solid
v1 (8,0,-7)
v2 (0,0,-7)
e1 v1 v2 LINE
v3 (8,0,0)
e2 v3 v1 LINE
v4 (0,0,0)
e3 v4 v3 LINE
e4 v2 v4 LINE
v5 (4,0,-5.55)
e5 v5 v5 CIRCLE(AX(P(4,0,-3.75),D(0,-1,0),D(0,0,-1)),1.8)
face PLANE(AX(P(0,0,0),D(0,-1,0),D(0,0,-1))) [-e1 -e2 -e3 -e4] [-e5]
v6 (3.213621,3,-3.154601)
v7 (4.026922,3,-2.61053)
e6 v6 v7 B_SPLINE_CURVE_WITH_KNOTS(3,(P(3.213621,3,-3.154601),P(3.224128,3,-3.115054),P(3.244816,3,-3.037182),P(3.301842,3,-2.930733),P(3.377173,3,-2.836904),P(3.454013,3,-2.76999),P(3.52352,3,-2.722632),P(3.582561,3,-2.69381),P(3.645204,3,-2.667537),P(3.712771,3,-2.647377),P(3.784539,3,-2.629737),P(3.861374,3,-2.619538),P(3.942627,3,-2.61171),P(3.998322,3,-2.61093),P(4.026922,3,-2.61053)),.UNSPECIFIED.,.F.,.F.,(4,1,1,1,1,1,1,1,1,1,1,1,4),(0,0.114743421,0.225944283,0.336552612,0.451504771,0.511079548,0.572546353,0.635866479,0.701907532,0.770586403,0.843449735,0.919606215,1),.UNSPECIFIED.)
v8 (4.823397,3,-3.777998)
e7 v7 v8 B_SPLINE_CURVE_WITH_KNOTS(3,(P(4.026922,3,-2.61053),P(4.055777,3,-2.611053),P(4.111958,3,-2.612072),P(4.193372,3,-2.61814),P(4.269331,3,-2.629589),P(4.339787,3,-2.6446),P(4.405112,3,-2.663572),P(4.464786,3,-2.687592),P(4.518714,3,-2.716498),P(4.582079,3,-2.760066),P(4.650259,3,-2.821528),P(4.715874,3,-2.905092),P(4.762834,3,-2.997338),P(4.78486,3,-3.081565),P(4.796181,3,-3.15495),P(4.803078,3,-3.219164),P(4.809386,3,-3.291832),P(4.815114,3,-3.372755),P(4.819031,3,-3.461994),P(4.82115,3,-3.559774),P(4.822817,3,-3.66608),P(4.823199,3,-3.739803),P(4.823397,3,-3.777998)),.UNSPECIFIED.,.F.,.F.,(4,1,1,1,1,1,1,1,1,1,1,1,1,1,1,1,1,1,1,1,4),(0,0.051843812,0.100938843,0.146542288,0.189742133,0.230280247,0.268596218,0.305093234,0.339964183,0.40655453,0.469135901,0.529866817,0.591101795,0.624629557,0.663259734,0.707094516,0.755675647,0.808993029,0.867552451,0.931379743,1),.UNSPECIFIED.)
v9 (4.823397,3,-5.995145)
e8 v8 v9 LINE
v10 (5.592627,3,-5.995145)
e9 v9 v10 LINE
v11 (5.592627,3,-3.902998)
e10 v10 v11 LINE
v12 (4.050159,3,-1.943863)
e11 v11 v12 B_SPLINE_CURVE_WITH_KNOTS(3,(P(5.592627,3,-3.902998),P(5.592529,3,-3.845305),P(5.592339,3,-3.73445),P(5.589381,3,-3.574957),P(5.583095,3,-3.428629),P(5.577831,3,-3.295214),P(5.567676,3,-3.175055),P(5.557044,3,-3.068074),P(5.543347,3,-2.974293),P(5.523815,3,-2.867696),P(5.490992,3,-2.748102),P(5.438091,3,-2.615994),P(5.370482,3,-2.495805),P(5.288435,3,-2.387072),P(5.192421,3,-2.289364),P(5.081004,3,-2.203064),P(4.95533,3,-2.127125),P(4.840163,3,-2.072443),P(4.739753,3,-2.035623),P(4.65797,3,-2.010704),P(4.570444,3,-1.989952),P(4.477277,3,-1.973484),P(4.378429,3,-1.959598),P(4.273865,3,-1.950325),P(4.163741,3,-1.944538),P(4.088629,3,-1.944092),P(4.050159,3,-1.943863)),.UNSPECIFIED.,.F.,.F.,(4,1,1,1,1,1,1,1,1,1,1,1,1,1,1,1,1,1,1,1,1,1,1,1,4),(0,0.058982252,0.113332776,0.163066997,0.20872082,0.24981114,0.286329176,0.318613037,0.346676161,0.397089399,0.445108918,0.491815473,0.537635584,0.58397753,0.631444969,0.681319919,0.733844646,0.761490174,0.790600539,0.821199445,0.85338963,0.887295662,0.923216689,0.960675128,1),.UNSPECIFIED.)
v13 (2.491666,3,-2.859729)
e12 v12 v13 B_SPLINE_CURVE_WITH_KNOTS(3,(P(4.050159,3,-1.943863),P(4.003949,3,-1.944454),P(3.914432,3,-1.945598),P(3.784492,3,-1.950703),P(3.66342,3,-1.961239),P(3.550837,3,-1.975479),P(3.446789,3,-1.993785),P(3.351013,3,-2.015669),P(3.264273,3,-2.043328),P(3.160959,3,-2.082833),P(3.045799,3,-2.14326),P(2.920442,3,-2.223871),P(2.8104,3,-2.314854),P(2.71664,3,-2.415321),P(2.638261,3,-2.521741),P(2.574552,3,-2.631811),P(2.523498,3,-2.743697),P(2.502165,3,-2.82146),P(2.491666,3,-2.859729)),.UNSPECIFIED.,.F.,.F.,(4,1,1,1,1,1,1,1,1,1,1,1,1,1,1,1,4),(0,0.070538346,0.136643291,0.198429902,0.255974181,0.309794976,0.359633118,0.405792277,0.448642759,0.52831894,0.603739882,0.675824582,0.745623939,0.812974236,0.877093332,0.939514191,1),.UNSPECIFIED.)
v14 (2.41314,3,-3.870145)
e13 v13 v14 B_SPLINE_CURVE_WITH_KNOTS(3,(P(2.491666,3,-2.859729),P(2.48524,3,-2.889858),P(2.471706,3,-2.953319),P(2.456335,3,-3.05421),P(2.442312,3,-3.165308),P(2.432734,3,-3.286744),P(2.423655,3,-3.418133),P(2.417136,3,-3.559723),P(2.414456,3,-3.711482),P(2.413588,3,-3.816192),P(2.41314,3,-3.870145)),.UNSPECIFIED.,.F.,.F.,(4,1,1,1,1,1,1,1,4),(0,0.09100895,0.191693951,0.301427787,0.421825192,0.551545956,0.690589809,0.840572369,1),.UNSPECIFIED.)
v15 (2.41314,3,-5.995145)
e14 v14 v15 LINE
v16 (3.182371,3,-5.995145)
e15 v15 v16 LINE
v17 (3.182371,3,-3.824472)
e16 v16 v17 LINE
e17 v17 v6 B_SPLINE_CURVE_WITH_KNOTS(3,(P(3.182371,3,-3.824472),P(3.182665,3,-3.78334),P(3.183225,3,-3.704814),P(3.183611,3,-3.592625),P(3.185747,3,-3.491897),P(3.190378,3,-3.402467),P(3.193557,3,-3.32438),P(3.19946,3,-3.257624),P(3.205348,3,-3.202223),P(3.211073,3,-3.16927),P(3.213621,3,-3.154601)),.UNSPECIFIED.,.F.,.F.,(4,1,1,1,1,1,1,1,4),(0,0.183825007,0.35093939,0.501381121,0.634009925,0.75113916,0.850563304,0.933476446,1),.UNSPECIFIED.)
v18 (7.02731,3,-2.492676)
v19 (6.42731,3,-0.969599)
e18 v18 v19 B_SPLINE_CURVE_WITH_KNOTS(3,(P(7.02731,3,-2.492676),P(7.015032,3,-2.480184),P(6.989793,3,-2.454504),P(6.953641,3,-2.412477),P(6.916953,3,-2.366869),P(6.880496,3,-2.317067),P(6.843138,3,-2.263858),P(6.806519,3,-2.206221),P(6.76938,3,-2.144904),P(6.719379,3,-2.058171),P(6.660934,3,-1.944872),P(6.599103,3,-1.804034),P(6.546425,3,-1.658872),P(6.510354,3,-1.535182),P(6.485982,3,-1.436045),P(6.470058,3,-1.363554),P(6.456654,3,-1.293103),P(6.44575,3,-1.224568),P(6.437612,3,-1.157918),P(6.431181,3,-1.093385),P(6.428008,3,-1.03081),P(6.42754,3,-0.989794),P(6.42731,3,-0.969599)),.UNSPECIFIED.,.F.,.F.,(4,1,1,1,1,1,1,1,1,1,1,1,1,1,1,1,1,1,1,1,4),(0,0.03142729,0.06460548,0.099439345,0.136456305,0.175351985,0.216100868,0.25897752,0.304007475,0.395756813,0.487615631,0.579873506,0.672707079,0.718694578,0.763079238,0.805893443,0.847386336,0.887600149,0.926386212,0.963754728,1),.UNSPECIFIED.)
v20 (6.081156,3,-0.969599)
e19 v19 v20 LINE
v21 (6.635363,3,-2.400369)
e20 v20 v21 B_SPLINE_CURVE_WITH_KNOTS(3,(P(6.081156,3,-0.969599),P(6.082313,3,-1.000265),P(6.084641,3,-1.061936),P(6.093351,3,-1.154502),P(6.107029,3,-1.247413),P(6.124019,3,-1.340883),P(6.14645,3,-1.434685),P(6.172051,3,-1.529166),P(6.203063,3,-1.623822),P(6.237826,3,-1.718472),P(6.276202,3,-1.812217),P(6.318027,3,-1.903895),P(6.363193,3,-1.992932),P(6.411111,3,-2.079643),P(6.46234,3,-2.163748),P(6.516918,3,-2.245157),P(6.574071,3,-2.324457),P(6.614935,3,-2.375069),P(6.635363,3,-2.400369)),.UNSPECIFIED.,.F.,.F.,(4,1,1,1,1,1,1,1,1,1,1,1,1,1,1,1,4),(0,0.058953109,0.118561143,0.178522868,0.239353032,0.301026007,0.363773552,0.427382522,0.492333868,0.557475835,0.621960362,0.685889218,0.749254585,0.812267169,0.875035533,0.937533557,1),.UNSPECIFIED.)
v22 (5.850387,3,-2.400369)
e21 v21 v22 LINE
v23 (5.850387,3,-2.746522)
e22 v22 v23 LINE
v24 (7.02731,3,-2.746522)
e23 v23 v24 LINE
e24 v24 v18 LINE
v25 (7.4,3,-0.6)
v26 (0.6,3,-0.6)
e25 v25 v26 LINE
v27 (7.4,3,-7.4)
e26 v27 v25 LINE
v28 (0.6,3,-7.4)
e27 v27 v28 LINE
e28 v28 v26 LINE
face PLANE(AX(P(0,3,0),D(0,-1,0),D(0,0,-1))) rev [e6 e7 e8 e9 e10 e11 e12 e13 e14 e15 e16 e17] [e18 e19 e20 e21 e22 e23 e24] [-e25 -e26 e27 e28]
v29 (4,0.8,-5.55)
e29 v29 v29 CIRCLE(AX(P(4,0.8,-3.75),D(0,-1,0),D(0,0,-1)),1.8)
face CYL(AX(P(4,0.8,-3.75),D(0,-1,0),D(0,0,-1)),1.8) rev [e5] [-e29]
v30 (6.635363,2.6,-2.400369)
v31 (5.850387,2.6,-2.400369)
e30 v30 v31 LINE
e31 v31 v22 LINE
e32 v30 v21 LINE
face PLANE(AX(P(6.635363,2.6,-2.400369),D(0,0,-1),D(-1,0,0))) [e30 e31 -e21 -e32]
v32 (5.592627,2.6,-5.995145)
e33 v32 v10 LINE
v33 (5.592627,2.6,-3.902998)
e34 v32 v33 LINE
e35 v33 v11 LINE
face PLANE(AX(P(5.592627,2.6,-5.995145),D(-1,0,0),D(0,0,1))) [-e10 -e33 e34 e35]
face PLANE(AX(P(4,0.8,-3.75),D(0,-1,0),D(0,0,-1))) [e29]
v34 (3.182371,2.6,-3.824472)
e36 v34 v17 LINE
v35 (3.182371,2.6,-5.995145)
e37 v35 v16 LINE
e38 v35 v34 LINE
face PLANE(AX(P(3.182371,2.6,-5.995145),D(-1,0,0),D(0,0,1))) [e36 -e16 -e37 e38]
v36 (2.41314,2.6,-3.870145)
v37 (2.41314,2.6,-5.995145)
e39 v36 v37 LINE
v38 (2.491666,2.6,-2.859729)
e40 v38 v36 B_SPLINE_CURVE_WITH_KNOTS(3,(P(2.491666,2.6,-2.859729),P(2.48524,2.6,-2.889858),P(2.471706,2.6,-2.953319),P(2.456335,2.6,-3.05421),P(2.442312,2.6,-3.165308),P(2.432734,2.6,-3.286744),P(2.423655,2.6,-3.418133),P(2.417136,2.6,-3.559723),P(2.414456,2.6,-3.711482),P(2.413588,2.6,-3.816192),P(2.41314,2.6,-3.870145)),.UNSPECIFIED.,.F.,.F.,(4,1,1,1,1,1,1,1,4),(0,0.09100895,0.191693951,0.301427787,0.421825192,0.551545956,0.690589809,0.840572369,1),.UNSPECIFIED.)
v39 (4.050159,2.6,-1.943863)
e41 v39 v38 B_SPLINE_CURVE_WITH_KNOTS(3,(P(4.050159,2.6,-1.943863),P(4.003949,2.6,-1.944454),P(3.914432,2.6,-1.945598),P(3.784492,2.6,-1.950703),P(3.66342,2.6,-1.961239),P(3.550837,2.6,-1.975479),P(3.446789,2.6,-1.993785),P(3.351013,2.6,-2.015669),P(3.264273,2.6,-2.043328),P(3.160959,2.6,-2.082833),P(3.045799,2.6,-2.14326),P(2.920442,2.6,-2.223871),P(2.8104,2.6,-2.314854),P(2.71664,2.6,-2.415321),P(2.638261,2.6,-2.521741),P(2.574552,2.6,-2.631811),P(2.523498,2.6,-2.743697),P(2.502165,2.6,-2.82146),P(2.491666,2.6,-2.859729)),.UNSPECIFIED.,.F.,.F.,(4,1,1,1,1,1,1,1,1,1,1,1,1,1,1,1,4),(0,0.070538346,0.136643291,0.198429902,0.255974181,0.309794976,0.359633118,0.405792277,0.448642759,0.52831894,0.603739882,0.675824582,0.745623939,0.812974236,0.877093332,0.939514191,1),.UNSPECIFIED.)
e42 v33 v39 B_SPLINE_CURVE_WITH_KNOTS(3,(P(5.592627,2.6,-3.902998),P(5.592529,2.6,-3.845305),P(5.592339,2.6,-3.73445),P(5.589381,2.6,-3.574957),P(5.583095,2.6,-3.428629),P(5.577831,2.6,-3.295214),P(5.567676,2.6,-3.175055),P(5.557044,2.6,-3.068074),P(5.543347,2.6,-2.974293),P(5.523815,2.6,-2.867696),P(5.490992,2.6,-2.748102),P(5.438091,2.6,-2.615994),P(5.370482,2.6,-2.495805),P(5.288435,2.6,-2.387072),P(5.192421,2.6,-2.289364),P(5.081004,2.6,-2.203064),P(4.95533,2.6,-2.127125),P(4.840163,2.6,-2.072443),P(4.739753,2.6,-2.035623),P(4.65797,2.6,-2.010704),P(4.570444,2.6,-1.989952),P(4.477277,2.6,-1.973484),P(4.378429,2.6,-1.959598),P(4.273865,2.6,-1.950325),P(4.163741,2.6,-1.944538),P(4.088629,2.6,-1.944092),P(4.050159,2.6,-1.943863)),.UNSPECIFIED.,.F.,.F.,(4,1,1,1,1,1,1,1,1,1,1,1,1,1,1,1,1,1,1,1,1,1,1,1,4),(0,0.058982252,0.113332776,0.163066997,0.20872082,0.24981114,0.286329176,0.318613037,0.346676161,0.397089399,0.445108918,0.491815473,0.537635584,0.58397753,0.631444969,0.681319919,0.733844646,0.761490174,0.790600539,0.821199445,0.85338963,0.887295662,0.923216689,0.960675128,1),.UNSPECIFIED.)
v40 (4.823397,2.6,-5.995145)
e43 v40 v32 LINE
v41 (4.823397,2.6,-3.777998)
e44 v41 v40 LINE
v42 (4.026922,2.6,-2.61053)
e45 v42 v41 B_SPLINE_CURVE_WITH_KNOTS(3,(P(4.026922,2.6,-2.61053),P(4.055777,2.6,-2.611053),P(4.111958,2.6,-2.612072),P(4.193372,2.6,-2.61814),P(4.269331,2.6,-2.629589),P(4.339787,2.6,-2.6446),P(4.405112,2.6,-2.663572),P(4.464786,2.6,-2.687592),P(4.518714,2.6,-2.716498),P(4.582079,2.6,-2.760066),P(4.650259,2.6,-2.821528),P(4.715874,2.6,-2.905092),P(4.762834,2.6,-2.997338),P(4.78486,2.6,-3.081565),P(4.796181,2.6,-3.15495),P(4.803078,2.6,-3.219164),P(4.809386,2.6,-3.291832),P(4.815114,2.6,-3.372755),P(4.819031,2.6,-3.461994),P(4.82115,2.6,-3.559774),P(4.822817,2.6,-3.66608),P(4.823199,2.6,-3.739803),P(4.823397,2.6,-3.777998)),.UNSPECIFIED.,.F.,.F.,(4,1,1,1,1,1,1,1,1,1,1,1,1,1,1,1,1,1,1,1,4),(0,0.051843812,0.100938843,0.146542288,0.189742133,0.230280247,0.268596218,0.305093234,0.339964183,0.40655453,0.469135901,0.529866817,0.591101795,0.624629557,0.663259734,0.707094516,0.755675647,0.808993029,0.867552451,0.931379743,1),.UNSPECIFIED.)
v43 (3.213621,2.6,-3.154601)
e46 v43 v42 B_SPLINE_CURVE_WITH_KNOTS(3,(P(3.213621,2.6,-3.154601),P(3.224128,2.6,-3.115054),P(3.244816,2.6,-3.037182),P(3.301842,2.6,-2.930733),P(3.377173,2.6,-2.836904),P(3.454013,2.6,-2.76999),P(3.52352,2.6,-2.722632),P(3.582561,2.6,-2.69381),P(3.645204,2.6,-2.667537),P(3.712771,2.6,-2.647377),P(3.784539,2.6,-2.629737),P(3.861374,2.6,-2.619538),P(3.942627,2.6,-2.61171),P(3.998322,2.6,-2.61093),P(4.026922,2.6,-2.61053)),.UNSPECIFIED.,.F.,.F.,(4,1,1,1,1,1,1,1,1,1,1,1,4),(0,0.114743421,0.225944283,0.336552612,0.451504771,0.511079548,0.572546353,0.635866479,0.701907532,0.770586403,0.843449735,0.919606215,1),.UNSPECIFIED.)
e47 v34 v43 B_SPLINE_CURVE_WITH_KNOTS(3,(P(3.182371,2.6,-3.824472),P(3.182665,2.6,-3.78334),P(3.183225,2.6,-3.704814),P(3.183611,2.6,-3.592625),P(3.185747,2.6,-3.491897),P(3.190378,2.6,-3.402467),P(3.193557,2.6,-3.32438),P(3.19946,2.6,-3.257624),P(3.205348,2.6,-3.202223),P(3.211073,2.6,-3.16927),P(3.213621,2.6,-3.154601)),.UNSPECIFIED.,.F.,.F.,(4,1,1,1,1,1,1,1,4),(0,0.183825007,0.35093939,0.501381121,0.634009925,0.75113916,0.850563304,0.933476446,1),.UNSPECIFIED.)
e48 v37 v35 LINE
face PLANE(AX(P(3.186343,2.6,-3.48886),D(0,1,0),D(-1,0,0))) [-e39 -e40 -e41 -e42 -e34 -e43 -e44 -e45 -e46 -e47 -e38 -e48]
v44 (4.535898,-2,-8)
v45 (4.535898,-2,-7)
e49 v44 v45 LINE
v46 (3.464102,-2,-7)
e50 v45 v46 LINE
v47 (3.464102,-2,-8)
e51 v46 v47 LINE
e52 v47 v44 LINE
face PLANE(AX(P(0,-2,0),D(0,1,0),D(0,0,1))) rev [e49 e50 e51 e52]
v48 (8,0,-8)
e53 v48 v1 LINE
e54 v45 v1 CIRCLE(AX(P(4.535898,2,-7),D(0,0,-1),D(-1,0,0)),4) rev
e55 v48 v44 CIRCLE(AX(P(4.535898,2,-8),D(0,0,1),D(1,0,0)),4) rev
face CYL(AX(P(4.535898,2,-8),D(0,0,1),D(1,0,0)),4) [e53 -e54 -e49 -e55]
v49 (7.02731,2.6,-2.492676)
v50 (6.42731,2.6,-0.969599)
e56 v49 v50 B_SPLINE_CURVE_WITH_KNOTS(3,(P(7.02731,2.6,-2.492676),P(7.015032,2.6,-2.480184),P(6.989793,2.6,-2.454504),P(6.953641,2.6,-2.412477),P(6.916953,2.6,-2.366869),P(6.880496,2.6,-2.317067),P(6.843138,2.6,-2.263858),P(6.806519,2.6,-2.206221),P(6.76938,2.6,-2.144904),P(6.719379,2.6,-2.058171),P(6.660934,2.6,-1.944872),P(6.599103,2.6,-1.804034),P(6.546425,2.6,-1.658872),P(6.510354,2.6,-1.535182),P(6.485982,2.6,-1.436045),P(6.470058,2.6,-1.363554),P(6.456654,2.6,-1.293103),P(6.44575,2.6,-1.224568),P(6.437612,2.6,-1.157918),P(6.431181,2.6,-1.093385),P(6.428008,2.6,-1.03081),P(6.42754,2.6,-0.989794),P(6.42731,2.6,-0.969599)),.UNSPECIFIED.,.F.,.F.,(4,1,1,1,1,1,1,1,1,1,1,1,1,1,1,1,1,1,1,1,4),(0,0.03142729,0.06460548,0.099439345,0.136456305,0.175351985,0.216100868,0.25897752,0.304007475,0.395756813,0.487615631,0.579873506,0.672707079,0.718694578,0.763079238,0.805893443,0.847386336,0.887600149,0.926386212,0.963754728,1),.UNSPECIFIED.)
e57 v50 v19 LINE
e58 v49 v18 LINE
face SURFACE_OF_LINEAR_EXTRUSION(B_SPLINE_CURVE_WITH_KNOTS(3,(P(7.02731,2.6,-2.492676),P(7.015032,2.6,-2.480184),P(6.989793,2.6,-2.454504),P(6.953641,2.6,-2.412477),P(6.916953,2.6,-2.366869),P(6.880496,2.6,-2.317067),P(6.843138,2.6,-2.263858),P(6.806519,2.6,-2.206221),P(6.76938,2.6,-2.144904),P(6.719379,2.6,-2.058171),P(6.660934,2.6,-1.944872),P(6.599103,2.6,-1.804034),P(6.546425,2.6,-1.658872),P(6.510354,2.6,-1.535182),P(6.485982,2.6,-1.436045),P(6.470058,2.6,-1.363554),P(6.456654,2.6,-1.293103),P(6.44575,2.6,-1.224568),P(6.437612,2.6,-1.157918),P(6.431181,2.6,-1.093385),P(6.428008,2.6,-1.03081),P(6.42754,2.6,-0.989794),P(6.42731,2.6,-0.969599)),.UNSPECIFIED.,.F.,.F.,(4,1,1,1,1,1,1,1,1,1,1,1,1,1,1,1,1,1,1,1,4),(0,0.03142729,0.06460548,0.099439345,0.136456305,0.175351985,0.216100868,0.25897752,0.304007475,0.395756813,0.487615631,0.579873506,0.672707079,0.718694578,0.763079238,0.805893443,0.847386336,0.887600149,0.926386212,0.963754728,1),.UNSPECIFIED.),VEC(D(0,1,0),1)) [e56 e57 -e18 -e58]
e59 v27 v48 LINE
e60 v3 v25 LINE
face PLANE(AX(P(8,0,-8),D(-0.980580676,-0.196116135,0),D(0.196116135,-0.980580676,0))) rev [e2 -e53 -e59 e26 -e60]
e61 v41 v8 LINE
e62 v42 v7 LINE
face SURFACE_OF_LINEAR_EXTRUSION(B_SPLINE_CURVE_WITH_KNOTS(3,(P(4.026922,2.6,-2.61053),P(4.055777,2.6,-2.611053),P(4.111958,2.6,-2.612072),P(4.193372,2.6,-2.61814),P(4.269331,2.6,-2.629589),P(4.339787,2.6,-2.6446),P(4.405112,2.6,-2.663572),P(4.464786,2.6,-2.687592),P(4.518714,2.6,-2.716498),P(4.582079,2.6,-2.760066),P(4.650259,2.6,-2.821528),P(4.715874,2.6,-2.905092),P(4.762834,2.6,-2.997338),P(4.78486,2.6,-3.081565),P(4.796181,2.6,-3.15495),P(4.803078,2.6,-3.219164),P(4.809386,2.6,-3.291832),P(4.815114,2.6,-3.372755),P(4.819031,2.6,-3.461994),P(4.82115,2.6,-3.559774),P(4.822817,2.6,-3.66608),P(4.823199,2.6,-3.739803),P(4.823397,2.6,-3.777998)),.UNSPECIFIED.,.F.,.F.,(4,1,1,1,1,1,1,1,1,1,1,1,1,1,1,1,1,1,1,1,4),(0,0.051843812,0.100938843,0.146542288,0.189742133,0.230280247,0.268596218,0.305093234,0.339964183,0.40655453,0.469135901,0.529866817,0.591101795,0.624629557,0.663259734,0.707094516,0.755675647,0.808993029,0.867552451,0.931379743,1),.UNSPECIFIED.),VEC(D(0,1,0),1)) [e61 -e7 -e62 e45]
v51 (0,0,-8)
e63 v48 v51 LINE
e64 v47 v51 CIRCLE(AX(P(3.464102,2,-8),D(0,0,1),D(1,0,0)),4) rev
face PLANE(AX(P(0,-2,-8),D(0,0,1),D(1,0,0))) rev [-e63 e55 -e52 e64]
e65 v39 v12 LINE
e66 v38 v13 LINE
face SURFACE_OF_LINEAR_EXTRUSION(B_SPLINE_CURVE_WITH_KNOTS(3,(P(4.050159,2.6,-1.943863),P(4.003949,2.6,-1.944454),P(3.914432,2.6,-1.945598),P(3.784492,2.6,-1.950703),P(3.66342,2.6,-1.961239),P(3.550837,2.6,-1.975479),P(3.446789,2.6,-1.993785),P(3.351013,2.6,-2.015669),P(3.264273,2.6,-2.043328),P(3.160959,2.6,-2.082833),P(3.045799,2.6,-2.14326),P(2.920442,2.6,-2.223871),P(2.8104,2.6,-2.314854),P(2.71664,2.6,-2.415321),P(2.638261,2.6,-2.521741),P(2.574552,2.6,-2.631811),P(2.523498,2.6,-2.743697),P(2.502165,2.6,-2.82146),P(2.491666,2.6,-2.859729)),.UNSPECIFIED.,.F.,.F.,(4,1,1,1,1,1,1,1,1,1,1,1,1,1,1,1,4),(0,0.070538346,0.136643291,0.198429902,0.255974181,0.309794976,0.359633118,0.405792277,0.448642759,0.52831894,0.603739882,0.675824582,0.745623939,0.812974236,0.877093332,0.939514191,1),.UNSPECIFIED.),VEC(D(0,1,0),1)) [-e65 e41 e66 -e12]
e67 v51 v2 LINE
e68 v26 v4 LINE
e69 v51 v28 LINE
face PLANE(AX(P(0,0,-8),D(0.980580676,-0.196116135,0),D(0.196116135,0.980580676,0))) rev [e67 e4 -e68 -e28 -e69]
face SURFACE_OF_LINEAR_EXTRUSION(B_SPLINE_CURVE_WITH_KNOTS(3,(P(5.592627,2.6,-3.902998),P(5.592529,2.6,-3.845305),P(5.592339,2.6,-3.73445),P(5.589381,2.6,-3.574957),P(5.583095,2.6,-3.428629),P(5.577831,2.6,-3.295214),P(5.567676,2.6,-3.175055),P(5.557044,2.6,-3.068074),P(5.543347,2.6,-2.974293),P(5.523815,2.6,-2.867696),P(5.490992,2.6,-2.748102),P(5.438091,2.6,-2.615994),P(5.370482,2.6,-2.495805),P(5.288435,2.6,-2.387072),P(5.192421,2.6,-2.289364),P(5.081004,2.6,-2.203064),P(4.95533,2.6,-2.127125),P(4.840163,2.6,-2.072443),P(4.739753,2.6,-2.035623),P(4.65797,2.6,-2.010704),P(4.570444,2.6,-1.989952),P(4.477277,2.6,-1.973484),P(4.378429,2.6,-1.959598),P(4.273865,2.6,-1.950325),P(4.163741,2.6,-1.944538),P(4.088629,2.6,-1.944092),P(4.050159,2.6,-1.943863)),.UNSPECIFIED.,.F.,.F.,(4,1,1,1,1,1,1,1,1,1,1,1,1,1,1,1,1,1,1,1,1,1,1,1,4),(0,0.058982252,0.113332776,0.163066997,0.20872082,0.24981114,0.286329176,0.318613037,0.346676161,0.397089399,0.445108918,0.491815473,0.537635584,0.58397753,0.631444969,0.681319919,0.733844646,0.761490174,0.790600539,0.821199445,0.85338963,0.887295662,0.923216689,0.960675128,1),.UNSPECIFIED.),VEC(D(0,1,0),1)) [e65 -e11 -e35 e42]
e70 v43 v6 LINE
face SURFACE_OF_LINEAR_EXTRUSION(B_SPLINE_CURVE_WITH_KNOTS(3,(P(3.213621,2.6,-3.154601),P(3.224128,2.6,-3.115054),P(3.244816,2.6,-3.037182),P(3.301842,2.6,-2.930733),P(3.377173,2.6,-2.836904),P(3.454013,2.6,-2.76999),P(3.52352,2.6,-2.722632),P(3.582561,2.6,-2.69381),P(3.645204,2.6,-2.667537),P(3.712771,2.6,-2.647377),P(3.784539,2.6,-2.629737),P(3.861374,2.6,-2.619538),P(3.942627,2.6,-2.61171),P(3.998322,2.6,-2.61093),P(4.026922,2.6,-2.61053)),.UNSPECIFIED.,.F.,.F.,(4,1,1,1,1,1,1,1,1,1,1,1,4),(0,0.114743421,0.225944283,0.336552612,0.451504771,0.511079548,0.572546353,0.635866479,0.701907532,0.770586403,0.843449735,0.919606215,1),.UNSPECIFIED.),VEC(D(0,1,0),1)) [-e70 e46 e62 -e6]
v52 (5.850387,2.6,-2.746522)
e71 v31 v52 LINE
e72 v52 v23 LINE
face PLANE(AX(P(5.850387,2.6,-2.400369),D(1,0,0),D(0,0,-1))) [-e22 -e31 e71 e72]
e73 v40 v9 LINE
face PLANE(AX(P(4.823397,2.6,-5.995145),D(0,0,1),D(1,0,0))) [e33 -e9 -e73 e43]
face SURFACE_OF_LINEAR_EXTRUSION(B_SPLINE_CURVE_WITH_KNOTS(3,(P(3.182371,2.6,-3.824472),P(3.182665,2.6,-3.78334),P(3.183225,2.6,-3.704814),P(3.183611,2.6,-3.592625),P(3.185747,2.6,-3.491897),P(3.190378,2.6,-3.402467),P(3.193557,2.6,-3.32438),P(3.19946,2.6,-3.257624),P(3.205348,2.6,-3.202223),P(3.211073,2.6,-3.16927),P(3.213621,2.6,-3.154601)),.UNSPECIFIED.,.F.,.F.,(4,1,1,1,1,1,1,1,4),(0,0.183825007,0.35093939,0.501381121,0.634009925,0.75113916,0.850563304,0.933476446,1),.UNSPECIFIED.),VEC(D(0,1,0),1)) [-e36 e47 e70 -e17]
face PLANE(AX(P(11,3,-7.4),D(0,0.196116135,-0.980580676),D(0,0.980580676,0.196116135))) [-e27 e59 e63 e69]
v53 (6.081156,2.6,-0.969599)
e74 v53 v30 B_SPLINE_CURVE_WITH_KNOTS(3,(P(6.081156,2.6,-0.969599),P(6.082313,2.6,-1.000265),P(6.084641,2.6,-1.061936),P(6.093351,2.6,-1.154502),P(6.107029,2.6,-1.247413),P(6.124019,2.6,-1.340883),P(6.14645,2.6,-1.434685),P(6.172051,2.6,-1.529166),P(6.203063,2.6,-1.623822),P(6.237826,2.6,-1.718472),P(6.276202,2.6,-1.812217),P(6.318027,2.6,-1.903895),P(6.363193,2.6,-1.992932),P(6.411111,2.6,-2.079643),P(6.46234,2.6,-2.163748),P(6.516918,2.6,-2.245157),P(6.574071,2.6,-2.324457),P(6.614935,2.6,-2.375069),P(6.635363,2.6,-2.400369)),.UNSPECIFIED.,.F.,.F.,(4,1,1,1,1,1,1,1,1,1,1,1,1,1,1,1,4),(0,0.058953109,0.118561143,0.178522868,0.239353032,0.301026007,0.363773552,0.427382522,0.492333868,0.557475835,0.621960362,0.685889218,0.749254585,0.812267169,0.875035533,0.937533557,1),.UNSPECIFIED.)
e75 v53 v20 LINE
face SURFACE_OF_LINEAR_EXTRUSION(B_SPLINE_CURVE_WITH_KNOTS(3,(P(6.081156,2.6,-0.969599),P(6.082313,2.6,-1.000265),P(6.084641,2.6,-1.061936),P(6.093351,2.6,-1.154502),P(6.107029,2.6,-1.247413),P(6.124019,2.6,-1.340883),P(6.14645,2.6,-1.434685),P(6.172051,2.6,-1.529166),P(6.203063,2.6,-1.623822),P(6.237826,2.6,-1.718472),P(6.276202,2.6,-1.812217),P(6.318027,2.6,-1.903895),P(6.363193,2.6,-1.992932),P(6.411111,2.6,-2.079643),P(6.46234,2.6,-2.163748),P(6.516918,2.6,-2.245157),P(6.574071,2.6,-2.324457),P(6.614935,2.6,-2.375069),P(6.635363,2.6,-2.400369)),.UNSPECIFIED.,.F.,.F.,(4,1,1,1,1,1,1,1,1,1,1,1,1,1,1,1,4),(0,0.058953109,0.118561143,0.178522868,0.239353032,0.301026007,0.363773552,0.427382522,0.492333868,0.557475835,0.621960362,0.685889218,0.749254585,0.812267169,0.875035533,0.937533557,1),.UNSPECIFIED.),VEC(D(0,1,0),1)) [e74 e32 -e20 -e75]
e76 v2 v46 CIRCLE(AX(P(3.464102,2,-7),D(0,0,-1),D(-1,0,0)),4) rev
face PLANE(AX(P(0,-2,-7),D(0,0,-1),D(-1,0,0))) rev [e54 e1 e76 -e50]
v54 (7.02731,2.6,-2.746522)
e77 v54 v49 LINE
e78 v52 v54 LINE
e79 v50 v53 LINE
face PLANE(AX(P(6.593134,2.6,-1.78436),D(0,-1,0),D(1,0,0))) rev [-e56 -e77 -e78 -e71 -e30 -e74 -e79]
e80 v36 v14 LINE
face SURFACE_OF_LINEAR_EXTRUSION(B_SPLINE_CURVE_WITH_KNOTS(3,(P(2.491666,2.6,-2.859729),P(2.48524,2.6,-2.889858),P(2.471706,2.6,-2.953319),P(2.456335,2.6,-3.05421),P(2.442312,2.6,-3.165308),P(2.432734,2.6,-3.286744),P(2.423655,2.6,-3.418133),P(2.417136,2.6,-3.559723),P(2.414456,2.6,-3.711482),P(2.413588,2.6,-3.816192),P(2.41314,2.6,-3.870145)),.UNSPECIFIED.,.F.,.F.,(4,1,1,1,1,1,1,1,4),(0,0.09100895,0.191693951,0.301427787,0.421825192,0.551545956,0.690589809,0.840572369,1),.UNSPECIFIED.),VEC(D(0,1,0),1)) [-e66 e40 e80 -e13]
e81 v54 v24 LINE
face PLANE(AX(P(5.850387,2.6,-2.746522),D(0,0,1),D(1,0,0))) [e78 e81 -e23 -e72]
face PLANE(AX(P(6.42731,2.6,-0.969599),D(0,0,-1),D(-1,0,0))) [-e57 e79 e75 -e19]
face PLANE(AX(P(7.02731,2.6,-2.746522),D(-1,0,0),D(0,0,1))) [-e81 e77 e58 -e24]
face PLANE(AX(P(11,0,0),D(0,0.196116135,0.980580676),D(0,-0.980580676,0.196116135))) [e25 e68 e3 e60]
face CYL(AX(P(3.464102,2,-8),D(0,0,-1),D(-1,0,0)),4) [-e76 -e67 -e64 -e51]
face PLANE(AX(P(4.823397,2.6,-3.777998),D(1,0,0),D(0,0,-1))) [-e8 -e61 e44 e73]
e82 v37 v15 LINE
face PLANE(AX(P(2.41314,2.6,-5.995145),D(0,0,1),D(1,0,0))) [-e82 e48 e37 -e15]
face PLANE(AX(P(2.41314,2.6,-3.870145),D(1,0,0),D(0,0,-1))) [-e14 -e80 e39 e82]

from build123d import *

# Parameters (mm, degrees)
SKETCH1_W               = 8
SKETCH1_H               = 8
BOSS_EXTRUDE1_DEPTH     = 3
CUT_EXTRUDE1_DEPTH      = 12.704699911
CUT_EXTRUDE1_DEPTH_BACK = 12.704699911
CUT_EXTRUDE2_DEPTH      = 11
SKETCH4_R               = 1.8
CUT_EXTRUDE3_DEPTH      = 0.8
SKETCH5_W               = 8
SKETCH5_H               = 1
BOSS_EXTRUDE2_DEPTH     = 2
FILLET1_R               = 4
CUT_EXTRUDE4_DEPTH      = 0.4
CUT_EXTRUDE5_DEPTH      = 0.4


with BuildPart() as part:
    # Sketch1 → Boss-Extrude1 (new body)
    with BuildSketch(Plane(origin=(0, 0, 0), x_dir=(1, 0, 0), z_dir=(0, 1, 0))):
        with Locations((4, 4)):
            Rectangle(SKETCH1_W, SKETCH1_H)
    extrude(amount=BOSS_EXTRUDE1_DEPTH)

    # Sketch2 → Cut-Extrude1 (cut, two sides: drawn at the far end of the back side and taken through both)
    with BuildSketch(Plane.XY.offset(-CUT_EXTRUDE1_DEPTH_BACK)):
        Polygon((0, 0), (0.6, 3), (0, 3), align=None)
        Polygon((8, 0), (7.4, 3), (8, 3), align=None)
    extrude(amount=CUT_EXTRUDE1_DEPTH + CUT_EXTRUDE1_DEPTH_BACK, mode=Mode.SUBTRACT)

    # Sketch3 → Cut-Extrude2 (cut)
    with BuildSketch(Plane(origin=(0, 0, 0), x_dir=(0, 0, -1), z_dir=(1, 0, 0))):
        Polygon((0, 0), (0.6, 3), (0, 3), align=None)
        Polygon((8, 3), (7.4, 3), (8, 0), align=None)
    extrude(amount=CUT_EXTRUDE2_DEPTH, mode=Mode.SUBTRACT)

    # Sketch4 → Cut-Extrude3 (cut)
    with BuildSketch(Plane.XZ):
        with Locations(Location((4, -3.75, 0), (0, 0, 270))):
            Circle(SKETCH4_R)
    extrude(amount=-CUT_EXTRUDE3_DEPTH, mode=Mode.SUBTRACT)

    # Sketch5 → Boss-Extrude2 (add)
    with BuildSketch(Plane.XZ):
        with Locations((4, -7.5)):
            Rectangle(SKETCH5_W, SKETCH5_H)
    extrude(amount=BOSS_EXTRUDE2_DEPTH)

    # Fillet1
    # the kernel refuses this fillet: 4 mm, written as the material it takes off along each edge
    with BuildSketch(Plane(origin=(8, -2, -16.660254038), x_dir=(0, 1, 0), z_dir=(0, 0, 1)), Plane(origin=(0, -2, 1.660254038), x_dir=(0, 1, 0), z_dir=(0, 0, -1))) as fillet1_piece_1:
        with BuildLine():
            CenterArc((4, 3.464101615), FILLET1_R, 180, 60)
            Line((0, 3.464101615), (-0.08, 3.464101615))
            Line((-0.08, 3.464101615), (-0.08, 0))
            Line((-0.08, 0), (0, -0.08))
            ThreePointArc((0, -0.08), (1, -0.08), (1.96, -0.069282032))
            Line((1.96, -0.069282032), (2, 0))
        make_face()
    extrude(amount=18.320508076, mode=Mode.SUBTRACT)

    # Sketch6 → Cut-Extrude4 (cut)
    with BuildSketch(Plane(origin=(0, 3, 0), x_dir=(1, 0, 0), z_dir=(0, 1, 0))):
        with BuildLine():
            Line((2.413140262, 5.995145478), (3.182371031, 5.995145478))
            Line((3.182371031, 5.995145478), (3.182371031, 3.824472401))
            add(Edge.make_bspline(
                [(3.182371031, 3.824472401), (3.182664695, 3.783339968), (3.183225327, 3.704814249), (3.183611242, 3.59262518), (3.18574694, 3.491896749), (3.190378411, 3.402466647), (3.193557117, 3.32438048), (3.199459629, 3.257623918), (3.205347836, 3.202222959), (3.211072588, 3.16927001), (3.213621031, 3.154600607)],
                knots=[0, 0, 0, 0, 1.470600056, 2.807515117, 4.011048972, 5.072079398, 6.00911328, 6.804506435, 7.467811572, 8, 8, 8, 8], degree=3))
            add(Edge.make_bspline(
                [(3.213621031, 3.154600607), (3.224127628, 3.115054038), (3.244816443, 3.03718185), (3.301842427, 2.930732637), (3.377172946, 2.83690436), (3.454012852, 2.769989694), (3.523520467, 2.722632459), (3.582561491, 2.693810163), (3.645203631, 2.667536787), (3.712771176, 2.647377448), (3.784538951, 2.629737301), (3.861373833, 2.619537644), (3.942627383, 2.611709661), (3.998321517, 2.610930314), (4.026922313, 2.610530094)],
                knots=[0, 0, 0, 0, 1.376921055, 2.711331395, 4.038631339, 5.418057255, 6.132954575, 6.870556231, 7.630397752, 8.422890386, 9.247036838, 10.121396817, 11.035274583, 12, 12, 12, 12], degree=3))
            add(Edge.make_bspline(
                [(4.026922313, 2.610530094), (4.055777389, 2.611053435), (4.111957634, 2.612072369), (4.193372399, 2.618140476), (4.269330983, 2.629588903), (4.339786919, 2.644600001), (4.40511233, 2.663571514), (4.464786061, 2.687591678), (4.518714075, 2.716497769), (4.582078678, 2.760066391), (4.650258908, 2.821527538), (4.715873674, 2.905091818), (4.762833649, 2.997337694), (4.784859868, 3.081565077), (4.796180605, 3.154949811), (4.803077806, 3.219164001), (4.809385646, 3.291832182), (4.815113647, 3.372755319), (4.819030865, 3.461994153), (4.821149619, 3.559774375), (4.82281709, 3.666080391), (4.823198873, 3.739802878), (4.823396672, 3.777998042)],
                knots=[0, 0, 0, 0, 1.036876239, 2.018776863, 2.930845756, 3.794842666, 4.605604932, 5.371924355, 6.101864688, 6.799283669, 8.1310906, 9.382718023, 10.597336334, 11.822035891, 12.492591141, 13.265194674, 14.141890321, 15.11351293, 16.179860579, 17.351049011, 18.627594861, 20, 20, 20, 20], degree=3))
            Line((4.823396672, 3.777998042), (4.823396672, 5.995145478))
            Line((4.823396672, 5.995145478), (5.592627441, 5.995145478))
            Line((5.592627441, 5.995145478), (5.592627441, 3.902998042))
            add(Edge.make_bspline(
                [(5.592627441, 3.902998042), (5.592528847, 3.845305157), (5.592339402, 3.734449864), (5.589381475, 3.574956755), (5.583094941, 3.428628514), (5.577830511, 3.295214312), (5.567675642, 3.175054503), (5.557043529, 3.068074376), (5.543346947, 2.974292627), (5.523815493, 2.867696041), (5.490991615, 2.748101531), (5.438090809, 2.615994056), (5.370481989, 2.495804532), (5.288434562, 2.387071806), (5.192421188, 2.289363714), (5.081004269, 2.203064381), (4.955329501, 2.127124651), (4.84016309, 2.072443299), (4.739752735, 2.035622669), (4.65797018, 2.010704116), (4.570444093, 1.989952175), (4.477277128, 1.973483664), (4.378429252, 1.959598273), (4.273864574, 1.950325107), (4.163741291, 1.944537997), (4.088628699, 1.944091898), (4.050159493, 1.943863427)],
                knots=[0, 0, 0, 0, 1.415574045, 2.719986624, 3.913607924, 5.00929969, 5.995467356, 6.871900228, 7.64671288, 8.320227872, 9.530145585, 10.682614022, 11.803571353, 12.90325401, 14.015460715, 15.154679255, 16.351678057, 17.612271512, 18.275764165, 18.974412946, 19.708786676, 20.481351116, 21.295095879, 22.157200529, 23.056203067, 24, 24, 24, 24], degree=3))
            add(Edge.make_bspline(
                [(4.050159493, 1.943863427), (4.00394899, 1.944454117), (3.914432357, 1.945598373), (3.784491522, 1.950702797), (3.663419731, 1.961238523), (3.550836598, 1.975478544), (3.446788608, 1.993784557), (3.351012543, 2.015669281), (3.264273035, 2.043328483), (3.160959321, 2.082832512), (3.045798952, 2.143260432), (2.920442018, 2.223870786), (2.810400187, 2.314853884), (2.716640343, 2.415320705), (2.638260762, 2.521740618), (2.574552012, 2.631810814), (2.523497916, 2.743696672), (2.502164616, 2.821459533), (2.491665903, 2.859728812)],
                knots=[0, 0, 0, 0, 1.128613534, 2.186292659, 3.174878439, 4.095586888, 4.95671962, 5.754129884, 6.492676435, 7.178284149, 8.453103036, 9.659838108, 10.813193309, 11.929983019, 13.007587775, 14.033493319, 15.032227051, 16, 16, 16, 16], degree=3))
            add(Edge.make_bspline(
                [(2.491665903, 2.859728812), (2.48524032, 2.889857793), (2.471705989, 2.953319061), (2.456334745, 3.054210037), (2.442311642, 3.165307899), (2.432733679, 3.286744058), (2.423654648, 3.418133217), (2.417136225, 3.559723113), (2.414455843, 3.711481594), (2.413587623, 3.816192051), (2.413140262, 3.870145478)],
                knots=[0, 0, 0, 0, 0.728071598, 1.533551606, 2.411422299, 3.374601532, 4.412367648, 5.524718474, 6.72457895, 8, 8, 8, 8], degree=3))
            Line((2.413140262, 3.870145478), (2.413140262, 5.995145478))
        make_face()
    extrude(amount=-CUT_EXTRUDE4_DEPTH, mode=Mode.SUBTRACT)

    # Sketch7 → Cut-Extrude5 (cut)
    with BuildSketch(Plane(origin=(0, 3, 0), x_dir=(1, 0, 0), z_dir=(0, 1, 0))):
        with BuildLine():
            Line((5.850386773, 2.400368579), (5.850386773, 2.746522425))
            Line((5.850386773, 2.746522425), (7.02730985, 2.746522425))
            Line((7.02730985, 2.746522425), (7.02730985, 2.492676271))
            add(Edge.make_bspline(
                [(7.02730985, 2.492676271), (7.015032321, 2.480184286), (6.989793248, 2.454504354), (6.953640746, 2.41247659), (6.916952595, 2.366869092), (6.880495981, 2.317067299), (6.84313767, 2.263857918), (6.806519427, 2.206220957), (6.769380335, 2.144904141), (6.719379376, 2.058171383), (6.660934493, 1.944871602), (6.599102899, 1.804034186), (6.546425212, 1.658871525), (6.510353845, 1.535182236), (6.485981829, 1.436045461), (6.470058334, 1.363554301), (6.45665413, 1.293103137), (6.44574982, 1.224568153), (6.437611625, 1.157918082), (6.431181064, 1.093384645), (6.428008496, 1.030810475), (6.427540351, 0.989794441), (6.42730985, 0.969599348)],
                knots=[0, 0, 0, 0, 0.628545797, 1.29210959, 1.98878689, 2.729126096, 3.507039704, 4.322017351, 5.179550397, 6.080149501, 7.915136253, 9.752312618, 11.597470118, 13.454141581, 14.373891568, 15.261584755, 16.117868869, 16.947726723, 17.752002974, 18.527724242, 19.275094557, 20, 20, 20, 20], degree=3))
            Line((6.42730985, 0.969599348), (6.081156004, 0.969599348))
            add(Edge.make_bspline(
                [(6.081156004, 0.969599348), (6.082313464, 1.000264514), (6.084641243, 1.061935513), (6.093350513, 1.15450167), (6.107029358, 1.247412503), (6.124019401, 1.340882746), (6.146450494, 1.434684851), (6.172051243, 1.529166286), (6.203062702, 1.623822431), (6.237825714, 1.718472296), (6.276202253, 1.812217257), (6.31802728, 1.903894573), (6.363192674, 1.992932291), (6.411111069, 2.079643245), (6.462339924, 2.16374848), (6.516917811, 2.245156666), (6.574070556, 2.324456683), (6.614935451, 2.375068877), (6.635362734, 2.400368579)],
                knots=[0, 0, 0, 0, 0.943249748, 1.896978291, 2.856365892, 3.829648507, 4.816416106, 5.820376826, 6.838120354, 7.877341886, 8.919613352, 9.951365796, 10.974227495, 11.988073359, 12.996274698, 14.000568529, 15.000536908, 16, 16, 16, 16], degree=3))
            Line((6.635362734, 2.400368579), (5.850386773, 2.400368579))
        make_face()
    extrude(amount=-CUT_EXTRUDE5_DEPTH, mode=Mode.SUBTRACT)


solid = part.part
